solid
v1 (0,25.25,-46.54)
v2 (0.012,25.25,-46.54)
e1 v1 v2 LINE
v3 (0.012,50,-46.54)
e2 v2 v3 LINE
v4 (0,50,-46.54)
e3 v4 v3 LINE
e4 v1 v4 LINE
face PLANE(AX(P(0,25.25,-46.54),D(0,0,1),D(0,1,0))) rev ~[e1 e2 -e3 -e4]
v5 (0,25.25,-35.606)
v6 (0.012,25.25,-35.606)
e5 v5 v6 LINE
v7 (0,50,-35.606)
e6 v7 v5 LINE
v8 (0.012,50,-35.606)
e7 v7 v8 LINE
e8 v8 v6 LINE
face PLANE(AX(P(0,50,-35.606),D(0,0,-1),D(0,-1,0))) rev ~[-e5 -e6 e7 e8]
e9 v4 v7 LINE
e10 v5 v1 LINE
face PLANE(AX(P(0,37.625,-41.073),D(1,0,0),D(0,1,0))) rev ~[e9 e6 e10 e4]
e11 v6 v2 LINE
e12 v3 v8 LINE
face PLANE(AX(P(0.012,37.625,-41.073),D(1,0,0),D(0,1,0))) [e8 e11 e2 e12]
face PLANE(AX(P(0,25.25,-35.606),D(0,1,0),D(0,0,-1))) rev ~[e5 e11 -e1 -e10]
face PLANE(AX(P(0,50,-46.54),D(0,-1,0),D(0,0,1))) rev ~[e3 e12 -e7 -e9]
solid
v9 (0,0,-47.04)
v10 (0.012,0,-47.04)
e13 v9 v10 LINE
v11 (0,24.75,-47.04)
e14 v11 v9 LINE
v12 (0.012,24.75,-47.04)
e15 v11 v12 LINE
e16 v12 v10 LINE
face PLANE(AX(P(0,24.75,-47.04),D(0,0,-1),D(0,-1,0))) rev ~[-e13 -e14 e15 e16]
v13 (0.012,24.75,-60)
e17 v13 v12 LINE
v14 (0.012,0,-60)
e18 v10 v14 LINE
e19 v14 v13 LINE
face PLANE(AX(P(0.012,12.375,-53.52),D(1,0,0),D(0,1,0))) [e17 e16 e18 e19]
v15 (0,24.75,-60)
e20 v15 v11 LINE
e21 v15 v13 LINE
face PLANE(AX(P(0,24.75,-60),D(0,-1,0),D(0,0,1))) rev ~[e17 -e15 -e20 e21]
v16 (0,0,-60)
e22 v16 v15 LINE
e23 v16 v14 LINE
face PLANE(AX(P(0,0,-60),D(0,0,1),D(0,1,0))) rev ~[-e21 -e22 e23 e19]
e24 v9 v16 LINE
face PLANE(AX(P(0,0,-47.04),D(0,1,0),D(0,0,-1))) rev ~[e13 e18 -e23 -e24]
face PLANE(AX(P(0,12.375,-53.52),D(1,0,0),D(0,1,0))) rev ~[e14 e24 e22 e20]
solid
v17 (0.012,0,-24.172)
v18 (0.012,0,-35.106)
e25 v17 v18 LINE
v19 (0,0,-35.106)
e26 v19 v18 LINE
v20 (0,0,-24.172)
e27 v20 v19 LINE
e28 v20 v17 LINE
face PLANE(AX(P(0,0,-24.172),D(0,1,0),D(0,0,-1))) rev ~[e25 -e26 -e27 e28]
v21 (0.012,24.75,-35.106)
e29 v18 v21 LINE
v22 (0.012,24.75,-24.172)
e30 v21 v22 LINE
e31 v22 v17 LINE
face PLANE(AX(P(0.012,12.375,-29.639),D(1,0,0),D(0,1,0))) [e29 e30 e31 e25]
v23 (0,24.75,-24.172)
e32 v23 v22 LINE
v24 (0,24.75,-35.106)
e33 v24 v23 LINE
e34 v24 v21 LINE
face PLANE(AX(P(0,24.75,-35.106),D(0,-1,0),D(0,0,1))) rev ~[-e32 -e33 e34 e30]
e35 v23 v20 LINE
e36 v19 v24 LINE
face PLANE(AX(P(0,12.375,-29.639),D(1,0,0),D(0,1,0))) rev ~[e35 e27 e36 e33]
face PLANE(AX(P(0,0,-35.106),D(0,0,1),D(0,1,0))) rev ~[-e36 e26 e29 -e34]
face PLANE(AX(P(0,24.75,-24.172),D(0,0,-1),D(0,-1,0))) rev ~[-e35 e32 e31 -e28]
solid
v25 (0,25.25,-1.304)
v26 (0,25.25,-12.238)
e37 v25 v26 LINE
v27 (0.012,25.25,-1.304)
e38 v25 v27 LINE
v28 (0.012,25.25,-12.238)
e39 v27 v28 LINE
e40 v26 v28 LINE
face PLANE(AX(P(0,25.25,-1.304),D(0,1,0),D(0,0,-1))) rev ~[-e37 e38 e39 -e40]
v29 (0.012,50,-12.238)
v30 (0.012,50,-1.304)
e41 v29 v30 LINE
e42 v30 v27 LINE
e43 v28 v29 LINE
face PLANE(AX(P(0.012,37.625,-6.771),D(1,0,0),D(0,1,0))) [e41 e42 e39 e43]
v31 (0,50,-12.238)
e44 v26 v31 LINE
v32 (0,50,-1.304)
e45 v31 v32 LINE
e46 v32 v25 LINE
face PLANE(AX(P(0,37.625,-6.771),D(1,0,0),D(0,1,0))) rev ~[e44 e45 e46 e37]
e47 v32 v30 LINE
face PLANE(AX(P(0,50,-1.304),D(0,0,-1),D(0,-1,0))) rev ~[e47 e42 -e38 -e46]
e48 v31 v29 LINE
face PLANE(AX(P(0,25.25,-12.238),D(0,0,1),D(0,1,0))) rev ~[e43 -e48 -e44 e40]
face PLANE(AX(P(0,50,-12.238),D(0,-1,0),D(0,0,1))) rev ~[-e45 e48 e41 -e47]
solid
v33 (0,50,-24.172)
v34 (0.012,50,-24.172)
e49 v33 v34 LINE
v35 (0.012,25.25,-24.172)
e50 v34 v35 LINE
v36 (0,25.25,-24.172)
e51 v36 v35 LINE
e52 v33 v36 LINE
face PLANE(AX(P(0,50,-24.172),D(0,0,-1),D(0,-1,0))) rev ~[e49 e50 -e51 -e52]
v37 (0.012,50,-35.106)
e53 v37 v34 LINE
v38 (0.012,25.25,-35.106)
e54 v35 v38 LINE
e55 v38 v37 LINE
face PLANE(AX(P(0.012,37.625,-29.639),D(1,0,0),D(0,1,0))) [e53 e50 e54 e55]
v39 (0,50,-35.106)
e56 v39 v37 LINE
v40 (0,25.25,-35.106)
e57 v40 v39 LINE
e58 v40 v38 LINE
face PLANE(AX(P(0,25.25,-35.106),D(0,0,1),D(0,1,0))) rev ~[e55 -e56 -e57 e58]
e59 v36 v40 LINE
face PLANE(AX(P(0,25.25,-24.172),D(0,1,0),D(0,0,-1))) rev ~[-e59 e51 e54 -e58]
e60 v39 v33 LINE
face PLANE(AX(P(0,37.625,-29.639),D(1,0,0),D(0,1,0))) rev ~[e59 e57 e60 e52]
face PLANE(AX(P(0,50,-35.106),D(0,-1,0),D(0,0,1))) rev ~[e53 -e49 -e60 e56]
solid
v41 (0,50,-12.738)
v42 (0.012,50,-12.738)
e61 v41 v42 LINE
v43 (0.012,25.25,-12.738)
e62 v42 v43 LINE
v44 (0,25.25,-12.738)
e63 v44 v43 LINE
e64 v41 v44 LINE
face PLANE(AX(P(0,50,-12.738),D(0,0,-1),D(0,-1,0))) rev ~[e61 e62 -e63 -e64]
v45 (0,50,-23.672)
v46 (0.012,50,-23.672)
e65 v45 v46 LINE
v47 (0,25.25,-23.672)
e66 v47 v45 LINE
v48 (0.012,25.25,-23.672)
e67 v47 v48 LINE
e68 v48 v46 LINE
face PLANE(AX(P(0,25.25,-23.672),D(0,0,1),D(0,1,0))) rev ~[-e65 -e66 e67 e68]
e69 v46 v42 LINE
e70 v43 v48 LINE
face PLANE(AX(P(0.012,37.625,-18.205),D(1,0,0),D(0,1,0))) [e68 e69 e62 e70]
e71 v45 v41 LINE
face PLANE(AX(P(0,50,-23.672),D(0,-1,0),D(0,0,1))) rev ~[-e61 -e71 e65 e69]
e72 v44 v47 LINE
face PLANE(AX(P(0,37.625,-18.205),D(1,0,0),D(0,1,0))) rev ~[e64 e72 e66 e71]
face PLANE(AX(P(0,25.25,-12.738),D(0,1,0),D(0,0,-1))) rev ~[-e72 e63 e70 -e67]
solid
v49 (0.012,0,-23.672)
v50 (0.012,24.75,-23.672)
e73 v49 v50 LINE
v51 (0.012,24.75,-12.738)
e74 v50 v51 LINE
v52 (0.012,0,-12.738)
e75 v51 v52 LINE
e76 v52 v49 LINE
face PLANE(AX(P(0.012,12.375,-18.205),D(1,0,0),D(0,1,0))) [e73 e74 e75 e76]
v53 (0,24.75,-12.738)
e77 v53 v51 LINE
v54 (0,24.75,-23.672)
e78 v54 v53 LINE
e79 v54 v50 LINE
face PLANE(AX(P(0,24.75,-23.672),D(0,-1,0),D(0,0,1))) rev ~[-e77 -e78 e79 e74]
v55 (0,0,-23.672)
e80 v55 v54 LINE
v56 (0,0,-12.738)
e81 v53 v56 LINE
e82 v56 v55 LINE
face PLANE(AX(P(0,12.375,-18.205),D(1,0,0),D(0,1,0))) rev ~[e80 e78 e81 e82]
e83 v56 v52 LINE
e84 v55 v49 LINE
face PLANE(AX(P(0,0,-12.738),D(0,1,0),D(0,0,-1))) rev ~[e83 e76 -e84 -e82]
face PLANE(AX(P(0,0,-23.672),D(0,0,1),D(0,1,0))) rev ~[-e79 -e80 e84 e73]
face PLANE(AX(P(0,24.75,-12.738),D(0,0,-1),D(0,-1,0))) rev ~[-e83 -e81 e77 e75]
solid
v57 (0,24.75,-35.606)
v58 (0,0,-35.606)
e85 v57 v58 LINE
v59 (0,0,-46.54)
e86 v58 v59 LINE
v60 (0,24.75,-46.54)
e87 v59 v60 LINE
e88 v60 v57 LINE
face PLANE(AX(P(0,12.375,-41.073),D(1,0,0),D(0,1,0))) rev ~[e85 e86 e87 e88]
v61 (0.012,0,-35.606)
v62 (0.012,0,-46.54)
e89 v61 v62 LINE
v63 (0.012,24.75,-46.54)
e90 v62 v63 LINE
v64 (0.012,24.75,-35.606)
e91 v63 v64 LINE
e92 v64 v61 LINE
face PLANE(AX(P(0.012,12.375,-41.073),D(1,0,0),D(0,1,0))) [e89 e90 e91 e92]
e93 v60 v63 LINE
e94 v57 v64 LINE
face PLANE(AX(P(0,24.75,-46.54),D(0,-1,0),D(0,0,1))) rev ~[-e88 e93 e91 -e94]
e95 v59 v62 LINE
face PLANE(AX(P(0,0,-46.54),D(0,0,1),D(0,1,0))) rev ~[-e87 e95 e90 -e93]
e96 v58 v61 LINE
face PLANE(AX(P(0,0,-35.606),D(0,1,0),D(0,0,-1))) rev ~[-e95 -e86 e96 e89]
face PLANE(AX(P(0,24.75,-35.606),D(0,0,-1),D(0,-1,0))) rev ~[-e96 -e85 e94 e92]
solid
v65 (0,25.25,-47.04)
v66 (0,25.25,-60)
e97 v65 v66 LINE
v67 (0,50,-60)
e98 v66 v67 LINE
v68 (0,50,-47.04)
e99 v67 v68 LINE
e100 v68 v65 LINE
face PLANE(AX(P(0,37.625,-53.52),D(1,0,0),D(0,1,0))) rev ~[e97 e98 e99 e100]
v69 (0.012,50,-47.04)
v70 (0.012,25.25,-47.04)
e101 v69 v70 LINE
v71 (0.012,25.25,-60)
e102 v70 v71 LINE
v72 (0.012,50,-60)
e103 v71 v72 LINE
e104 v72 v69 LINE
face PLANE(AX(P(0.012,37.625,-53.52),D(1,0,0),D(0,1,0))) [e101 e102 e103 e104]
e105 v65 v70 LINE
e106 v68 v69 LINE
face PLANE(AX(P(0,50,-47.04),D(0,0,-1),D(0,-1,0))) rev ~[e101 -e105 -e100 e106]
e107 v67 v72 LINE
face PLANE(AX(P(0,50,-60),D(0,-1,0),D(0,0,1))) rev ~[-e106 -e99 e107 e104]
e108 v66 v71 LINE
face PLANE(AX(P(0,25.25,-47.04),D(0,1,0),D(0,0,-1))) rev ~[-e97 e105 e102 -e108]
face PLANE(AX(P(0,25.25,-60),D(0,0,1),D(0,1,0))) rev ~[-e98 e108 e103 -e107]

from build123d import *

# Parameters (mm, degrees)
F1_DEPTH = 0.012


# Not quite as in the source:
# - a feature names something its author has since deleted; it is built from what else it names


with BuildPart() as f1:
    # F0 (on Right) → F1 (new body)
    with BuildSketch(Plane.YZ):
        Polygon((50, -12.238), (50, -1.304), (25.25, -1.304), (25.25, -3.119), (25.25, -6.119), (25.25, -6.521), (25.25, -7.021), (25.25, -9.119), (25.25, -12.238), align=None)
    extrude(amount=F1_DEPTH)


with BuildPart() as f1b:
    # F0 (on Right) → F1, piece 2 (new body)
    with BuildSketch(Plane.YZ):
        Polygon((12.375, -12.738), (7.3750000447, -12.738), (0, -12.738), (0, -23.672), (24.75, -23.672), (24.75, -21.205), (24.75, -18.205), (24.75, -15.205), (24.75, -12.738), (17.375, -12.738), align=None)
    extrude(amount=F1_DEPTH)


with BuildPart() as f1c:
    # F0 (on Right) → F1, piece 3 (new body)
    with BuildSketch(Plane.YZ):
        Polygon((25.25, -12.738), (25.25, -15.205), (25.25, -17.955), (25.25, -18.205), (25.25, -18.455), (25.25, -21.205), (25.25, -23.672), (50, -23.672), (50, -12.738), align=None)
    extrude(amount=F1_DEPTH)


with BuildPart() as f1d:
    # F0 (on Right) → F1, piece 4 (new body)
    with BuildSketch(Plane.YZ):
        Polygon((50, -24.172), (25.25, -24.172), (25.25, -29.389), (25.25, -29.889), (25.25, -35.106), (50, -35.106), align=None)
    extrude(amount=F1_DEPTH)


with BuildPart() as f1e:
    # F0 (on Right) → F1, piece 5 (new body)
    with BuildSketch(Plane.YZ):
        Polygon((24.75, -24.172), (0, -24.172), (0, -35.106), (24.75, -35.106), (24.75, -29.889), (24.75, -29.389), align=None)
    extrude(amount=F1_DEPTH)


with BuildPart() as f1f:
    # F0 (on Right) → F1, piece 6 (new body)
    with BuildSketch(Plane.YZ):
        Polygon((24.75, -35.606), (0, -35.606), (0, -46.54), (24.75, -46.54), (24.75, -41.323), (24.75, -40.823), align=None)
    extrude(amount=F1_DEPTH)


with BuildPart() as f1g:
    # F0 (on Right) → F1, piece 7 (new body)
    with BuildSketch(Plane.YZ):
        Polygon((50, -35.606), (25.25, -35.606), (25.25, -40.823), (25.25, -41.323), (25.25, -46.54), (50, -46.54), align=None)
    extrude(amount=F1_DEPTH)


with BuildPart() as f1h:
    # F0 (on Right) → F1, piece 8 (new body)
    with BuildSketch(Plane.YZ):
        Polygon((25.25, -52.757), (25.25, -60), (50, -60), (50, -47.04), (25.25, -47.04), (25.25, -52.257), align=None)
    extrude(amount=F1_DEPTH)


with BuildPart() as f1i:
    # F0 (on Right) → F1, piece 9 (new body)
    with BuildSketch(Plane.YZ):
        Polygon((0, -47.04), (0, -60), (24.75, -60), (24.75, -52.757), (24.75, -52.257), (24.75, -47.04), align=None)
    extrude(amount=F1_DEPTH)


solid = Compound([f1.part, f1b.part, f1c.part, f1d.part, f1e.part, f1f.part, f1g.part, f1h.part, f1i.part])
